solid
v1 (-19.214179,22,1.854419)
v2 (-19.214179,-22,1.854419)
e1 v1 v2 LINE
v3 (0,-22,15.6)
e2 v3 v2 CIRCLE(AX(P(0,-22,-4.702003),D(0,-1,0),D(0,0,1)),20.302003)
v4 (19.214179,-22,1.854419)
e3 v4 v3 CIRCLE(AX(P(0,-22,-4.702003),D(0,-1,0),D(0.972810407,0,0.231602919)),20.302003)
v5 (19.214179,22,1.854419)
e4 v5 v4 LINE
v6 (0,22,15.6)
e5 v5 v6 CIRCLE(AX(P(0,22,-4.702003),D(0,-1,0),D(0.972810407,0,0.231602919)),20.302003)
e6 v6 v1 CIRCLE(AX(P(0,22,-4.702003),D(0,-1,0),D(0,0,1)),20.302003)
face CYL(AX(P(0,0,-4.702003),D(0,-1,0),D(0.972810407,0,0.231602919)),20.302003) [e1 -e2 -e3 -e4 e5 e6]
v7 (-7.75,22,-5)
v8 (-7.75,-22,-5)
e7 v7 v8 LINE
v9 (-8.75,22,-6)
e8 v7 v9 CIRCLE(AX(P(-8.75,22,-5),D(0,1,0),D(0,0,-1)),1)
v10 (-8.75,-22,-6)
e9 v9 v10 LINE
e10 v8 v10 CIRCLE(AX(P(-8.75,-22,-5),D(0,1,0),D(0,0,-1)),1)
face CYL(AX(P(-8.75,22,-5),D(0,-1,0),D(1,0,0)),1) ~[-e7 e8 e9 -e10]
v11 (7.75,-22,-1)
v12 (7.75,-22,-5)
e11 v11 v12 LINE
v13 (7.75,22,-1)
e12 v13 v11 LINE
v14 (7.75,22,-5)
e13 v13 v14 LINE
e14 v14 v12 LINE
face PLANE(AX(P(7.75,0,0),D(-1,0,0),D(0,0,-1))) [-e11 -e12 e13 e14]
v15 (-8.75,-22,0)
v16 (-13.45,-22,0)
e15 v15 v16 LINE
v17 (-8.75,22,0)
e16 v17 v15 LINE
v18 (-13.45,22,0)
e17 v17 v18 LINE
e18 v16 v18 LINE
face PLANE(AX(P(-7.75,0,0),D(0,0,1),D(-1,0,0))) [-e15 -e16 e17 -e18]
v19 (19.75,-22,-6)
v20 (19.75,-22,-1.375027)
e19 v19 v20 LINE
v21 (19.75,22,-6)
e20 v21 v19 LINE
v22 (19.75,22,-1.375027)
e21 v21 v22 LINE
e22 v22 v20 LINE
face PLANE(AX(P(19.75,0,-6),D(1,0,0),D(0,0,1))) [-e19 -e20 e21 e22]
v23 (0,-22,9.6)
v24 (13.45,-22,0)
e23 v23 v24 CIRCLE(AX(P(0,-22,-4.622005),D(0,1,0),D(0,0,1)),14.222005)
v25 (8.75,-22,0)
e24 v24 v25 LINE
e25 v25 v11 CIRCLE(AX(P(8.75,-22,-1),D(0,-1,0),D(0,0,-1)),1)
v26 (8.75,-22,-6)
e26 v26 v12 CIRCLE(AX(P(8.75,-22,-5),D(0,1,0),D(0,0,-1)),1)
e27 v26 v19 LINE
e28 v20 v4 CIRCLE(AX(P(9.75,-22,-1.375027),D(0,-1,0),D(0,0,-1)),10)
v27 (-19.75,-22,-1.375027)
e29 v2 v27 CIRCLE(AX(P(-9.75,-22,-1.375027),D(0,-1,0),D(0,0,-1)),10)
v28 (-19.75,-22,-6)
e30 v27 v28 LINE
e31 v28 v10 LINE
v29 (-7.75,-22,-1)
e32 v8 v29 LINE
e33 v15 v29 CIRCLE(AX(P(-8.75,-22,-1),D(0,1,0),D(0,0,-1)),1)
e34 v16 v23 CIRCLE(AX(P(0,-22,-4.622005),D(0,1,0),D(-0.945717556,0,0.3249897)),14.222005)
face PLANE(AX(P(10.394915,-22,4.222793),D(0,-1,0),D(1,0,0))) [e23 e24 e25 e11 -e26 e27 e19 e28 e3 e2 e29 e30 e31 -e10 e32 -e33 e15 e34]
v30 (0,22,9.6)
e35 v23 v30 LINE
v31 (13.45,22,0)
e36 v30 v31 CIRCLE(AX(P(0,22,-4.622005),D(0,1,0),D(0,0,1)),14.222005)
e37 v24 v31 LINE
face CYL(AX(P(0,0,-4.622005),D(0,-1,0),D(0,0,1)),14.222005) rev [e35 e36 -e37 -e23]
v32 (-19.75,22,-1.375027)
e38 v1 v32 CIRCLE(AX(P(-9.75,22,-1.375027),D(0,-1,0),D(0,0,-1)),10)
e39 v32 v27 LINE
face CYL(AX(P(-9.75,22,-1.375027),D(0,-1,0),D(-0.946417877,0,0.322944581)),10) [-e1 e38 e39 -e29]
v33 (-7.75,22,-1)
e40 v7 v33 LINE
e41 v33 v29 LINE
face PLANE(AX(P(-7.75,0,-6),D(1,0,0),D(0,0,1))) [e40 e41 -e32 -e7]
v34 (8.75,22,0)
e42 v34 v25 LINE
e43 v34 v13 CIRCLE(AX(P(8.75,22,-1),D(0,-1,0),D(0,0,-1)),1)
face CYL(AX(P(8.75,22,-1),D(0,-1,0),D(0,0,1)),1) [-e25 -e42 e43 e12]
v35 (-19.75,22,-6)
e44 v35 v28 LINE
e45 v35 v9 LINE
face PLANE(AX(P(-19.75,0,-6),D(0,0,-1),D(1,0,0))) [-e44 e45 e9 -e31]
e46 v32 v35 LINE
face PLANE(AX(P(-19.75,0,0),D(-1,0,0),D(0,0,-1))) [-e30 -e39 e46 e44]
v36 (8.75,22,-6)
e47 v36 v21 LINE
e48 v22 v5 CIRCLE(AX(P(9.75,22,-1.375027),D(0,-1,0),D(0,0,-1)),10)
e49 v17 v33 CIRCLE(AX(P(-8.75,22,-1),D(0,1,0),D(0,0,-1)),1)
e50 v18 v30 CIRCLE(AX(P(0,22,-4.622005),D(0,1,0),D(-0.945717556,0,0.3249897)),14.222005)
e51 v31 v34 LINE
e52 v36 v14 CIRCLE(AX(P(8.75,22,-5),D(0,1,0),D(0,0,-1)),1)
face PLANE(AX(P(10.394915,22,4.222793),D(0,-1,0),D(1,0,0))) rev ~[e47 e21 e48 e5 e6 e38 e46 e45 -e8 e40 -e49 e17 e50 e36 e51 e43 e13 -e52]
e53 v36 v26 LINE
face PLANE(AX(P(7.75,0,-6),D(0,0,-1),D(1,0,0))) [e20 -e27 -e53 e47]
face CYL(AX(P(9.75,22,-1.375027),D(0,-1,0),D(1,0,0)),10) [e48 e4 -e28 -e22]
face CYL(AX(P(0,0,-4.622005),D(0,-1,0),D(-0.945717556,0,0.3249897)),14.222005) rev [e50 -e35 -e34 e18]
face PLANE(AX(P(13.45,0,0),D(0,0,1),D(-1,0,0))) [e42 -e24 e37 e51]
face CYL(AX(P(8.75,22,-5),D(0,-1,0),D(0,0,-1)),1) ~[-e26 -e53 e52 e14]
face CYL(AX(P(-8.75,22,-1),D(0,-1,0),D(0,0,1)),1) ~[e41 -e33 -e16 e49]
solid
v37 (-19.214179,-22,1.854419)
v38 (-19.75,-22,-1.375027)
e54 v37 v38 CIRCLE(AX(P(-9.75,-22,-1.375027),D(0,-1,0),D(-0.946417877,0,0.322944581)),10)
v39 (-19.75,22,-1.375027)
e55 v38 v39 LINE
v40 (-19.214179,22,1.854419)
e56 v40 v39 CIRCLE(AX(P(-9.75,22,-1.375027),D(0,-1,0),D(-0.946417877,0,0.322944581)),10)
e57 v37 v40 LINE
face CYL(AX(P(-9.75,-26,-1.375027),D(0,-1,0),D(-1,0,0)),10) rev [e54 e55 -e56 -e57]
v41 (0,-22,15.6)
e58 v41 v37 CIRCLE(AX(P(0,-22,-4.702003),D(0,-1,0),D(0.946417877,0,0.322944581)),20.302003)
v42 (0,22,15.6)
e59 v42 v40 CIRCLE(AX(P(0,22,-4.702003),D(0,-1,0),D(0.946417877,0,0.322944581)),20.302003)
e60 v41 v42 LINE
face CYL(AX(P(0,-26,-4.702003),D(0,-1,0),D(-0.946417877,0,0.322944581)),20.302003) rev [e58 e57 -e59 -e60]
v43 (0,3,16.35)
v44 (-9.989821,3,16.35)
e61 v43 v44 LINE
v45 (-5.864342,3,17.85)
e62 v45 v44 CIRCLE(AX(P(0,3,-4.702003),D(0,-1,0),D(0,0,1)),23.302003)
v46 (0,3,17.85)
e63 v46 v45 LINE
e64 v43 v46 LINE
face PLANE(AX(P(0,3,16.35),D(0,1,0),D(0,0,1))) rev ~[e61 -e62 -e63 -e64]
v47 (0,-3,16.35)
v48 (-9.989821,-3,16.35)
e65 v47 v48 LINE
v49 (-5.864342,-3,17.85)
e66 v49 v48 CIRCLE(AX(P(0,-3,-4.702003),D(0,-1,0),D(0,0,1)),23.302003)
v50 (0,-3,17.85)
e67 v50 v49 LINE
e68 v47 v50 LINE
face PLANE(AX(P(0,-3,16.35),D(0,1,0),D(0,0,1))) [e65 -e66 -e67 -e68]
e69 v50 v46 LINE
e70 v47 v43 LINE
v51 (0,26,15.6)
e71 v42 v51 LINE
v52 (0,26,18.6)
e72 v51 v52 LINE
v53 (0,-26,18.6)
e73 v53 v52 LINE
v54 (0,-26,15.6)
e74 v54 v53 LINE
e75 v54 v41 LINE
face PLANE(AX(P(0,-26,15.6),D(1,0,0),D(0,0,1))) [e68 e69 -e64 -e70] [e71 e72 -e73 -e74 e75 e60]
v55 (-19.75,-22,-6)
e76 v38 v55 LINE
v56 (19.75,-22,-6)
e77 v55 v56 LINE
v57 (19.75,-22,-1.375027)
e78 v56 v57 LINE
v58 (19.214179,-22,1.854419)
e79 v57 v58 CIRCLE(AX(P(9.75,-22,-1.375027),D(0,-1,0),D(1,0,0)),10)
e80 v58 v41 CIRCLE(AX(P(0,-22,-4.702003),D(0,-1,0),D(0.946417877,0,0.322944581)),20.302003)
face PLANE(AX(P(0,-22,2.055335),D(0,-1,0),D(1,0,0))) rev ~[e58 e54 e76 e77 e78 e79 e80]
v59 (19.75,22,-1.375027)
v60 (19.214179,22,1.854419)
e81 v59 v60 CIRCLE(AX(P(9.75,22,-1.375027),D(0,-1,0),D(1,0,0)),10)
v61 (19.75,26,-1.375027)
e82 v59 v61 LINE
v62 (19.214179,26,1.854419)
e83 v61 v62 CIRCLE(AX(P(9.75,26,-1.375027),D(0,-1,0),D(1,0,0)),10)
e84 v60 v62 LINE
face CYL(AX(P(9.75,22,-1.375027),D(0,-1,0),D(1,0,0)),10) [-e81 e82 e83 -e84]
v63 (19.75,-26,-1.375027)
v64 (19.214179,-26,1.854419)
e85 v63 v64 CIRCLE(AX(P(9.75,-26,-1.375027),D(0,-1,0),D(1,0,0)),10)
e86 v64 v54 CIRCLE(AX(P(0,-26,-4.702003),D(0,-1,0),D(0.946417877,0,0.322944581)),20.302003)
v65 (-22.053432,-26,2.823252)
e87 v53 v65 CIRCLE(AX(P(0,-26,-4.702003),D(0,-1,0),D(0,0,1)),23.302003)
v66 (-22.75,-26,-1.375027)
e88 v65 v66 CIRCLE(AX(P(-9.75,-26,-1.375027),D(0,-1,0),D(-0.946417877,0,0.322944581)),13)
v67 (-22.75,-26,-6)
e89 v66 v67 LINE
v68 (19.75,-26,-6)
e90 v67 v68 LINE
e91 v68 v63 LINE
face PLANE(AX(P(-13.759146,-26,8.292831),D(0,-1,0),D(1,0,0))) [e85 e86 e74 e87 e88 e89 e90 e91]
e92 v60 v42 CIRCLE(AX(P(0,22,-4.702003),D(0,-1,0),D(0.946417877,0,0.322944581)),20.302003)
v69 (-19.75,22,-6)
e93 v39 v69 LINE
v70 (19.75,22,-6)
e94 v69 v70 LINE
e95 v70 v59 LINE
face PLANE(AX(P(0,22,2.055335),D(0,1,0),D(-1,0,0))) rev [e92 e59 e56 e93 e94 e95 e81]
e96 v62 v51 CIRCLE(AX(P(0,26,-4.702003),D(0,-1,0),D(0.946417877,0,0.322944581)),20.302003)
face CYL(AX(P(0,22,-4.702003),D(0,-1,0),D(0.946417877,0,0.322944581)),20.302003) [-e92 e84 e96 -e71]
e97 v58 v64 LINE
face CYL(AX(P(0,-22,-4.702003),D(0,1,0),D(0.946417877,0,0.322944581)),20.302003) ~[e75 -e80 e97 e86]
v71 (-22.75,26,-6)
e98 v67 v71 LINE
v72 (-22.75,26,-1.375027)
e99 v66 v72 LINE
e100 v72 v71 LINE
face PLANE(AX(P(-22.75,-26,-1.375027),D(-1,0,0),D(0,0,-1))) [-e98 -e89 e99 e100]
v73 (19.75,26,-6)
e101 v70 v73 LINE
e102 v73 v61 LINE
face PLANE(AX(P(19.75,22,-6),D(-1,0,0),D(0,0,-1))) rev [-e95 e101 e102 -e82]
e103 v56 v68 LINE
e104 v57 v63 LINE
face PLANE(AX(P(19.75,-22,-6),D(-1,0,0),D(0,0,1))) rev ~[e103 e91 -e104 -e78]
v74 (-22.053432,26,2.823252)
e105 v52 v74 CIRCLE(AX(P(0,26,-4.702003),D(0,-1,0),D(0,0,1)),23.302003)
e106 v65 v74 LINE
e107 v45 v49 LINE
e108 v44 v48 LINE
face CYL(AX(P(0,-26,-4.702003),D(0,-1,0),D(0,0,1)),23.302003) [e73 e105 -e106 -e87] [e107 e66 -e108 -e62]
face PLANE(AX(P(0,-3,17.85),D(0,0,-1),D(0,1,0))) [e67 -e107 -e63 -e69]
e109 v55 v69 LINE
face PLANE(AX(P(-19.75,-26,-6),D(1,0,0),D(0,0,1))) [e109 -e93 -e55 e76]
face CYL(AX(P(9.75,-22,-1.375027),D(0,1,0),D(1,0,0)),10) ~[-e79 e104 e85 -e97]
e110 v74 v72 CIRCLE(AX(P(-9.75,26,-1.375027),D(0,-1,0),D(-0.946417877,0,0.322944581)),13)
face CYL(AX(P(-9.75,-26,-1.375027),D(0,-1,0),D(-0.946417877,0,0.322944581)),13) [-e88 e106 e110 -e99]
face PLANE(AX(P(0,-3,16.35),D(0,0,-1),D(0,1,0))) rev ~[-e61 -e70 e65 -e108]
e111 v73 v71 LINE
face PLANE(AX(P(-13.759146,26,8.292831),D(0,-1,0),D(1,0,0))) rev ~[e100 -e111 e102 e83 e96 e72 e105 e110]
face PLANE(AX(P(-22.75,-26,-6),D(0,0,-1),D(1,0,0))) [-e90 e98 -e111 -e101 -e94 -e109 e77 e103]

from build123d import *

# Parameters (mm, degrees)
F1_DEPTH = 22
F10_R    = 1
F11_R    = 10
F3_DEPTH = 4
F7_DEPTH = 52
F8_W     = 6
F8_H     = 1.5
F9_DEPTH = 25


# Not quite as in the source:
# - a feature of the source that left no trace in its solid (it failed there, or was rolled back) is left out


with BuildPart() as f1:
    # F0 (on Front) → F1 (new body, symmetric)
    with BuildSketch(Plane.XZ):
        with BuildLine():
            Line((13.45, 0), (7.75, 0))
            Line((7.75, 0), (7.75, -6))
            Line((7.75, -6), (19.75, -6))
            Line((19.75, -6), (19.75, 0))
            ThreePointArc((19.75, 0), (12.583943142, 11.2295914778), (0, 15.6))
            Line((0, 15.6), (0, 9.6))
            ThreePointArc((0, 9.6), (8.2623014348, 6.9538233644), (13.45, 0))
        make_face()
        with BuildLine():
            ThreePointArc((-13.45, 0), (-8.2623014348, 6.9538233644), (0, 9.6))
            Line((0, 9.6), (0, 15.6))
            ThreePointArc((0, 15.6), (-12.583943142, 11.2295914778), (-19.75, 0))
            Line((-19.75, 0), (-19.75, -6))
            Line((-19.75, -6), (-7.75, -6))
            Line((-7.75, -6), (-7.75, 0))
            Line((-7.75, 0), (-13.45, 0))
        make_face()
    extrude(amount=F1_DEPTH, both=True)

    # F10
    f10_edges = [f1.edges().sort_by_distance(p)[0] for p in [
        (-7.75, 0, -6),
        (-7.75, 0, 0),
        (7.75, 0, 0),
        (7.75, 0, -6),
    ]]
    fillet(f10_edges, radius=F10_R)

    # F11
    f11_edges = [f1.edges().sort_by_distance(p)[0] for p in [
        (19.75, 0, 0),
        (-19.75, 0, 0),
    ]]
    fillet(f11_edges, radius=F11_R)


with BuildPart() as f3:
    # F2 (on face) → F3 (new body)
    with BuildSketch(Plane.XZ.offset(22)):
        with BuildLine():
            ThreePointArc((19.75, -1.3750270948), (19.6151352671, 0.2617704372), (19.2141787678, 1.8544187169))
            ThreePointArc((19.2141787678, 1.8544187169), (0, 15.6), (-19.2141787678, 1.8544187169))
            ThreePointArc((-19.2141787678, 1.8544187169), (-19.6151352671, 0.2617704372), (-19.75, -1.3750270948))
            Line((-19.75, -1.3750270948), (-19.75, -6))
            Line((-19.75, -6), (-8.75, -6))
            Line((-8.75, -6), (8.75, -6))
            Line((8.75, -6), (19.75, -6))
            Line((19.75, -6), (19.75, -1.3750270948))
        make_face()
    extrude(amount=F3_DEPTH)


with BuildPart() as f12_1:
    # F12: instance of F3
    add(f3.part.mirror(Plane.XZ))


with BuildPart() as f3_1:
    add(f3.part)

    add(f12_1.part)  # F7 merges F12_1
    # F6 (on face) → F7 (join, through all)
    with BuildSketch(Plane.XZ.offset(26)):
        with BuildLine():
            ThreePointArc((0, 18.6), (-13.5578357737, 14.2497366228), (-22.0534323982, 2.8232524604))
            ThreePointArc((-22.0534323982, 2.8232524604), (-22.5746758473, 0.7528096968), (-22.75, -1.3750270948))
            Line((-22.75, -1.3750270948), (-22.75, -6))
            Line((-22.75, -6), (-19.75, -6))
            Line((-19.75, -6), (-19.75, -1.3750270948))
            ThreePointArc((-19.75, -1.3750270948), (-19.6151352671, 0.2617704372), (-19.2141787678, 1.8544187169))
            ThreePointArc((-19.2141787678, 1.8544187169), (-11.8123417506, 11.8098082191), (0, 15.6))
            Line((0, 15.6), (0, 18.6))
        make_face()
    extrude(amount=-F7_DEPTH)

    # F8 (on face) → F9 (cut)
    with BuildSketch(Plane.YZ):
        with Locations((0, 17.0999999998)):
            Rectangle(F8_W, F8_H)
    extrude(amount=-F9_DEPTH, mode=Mode.SUBTRACT)


solid = Compound([f1.part, f3_1.part])
